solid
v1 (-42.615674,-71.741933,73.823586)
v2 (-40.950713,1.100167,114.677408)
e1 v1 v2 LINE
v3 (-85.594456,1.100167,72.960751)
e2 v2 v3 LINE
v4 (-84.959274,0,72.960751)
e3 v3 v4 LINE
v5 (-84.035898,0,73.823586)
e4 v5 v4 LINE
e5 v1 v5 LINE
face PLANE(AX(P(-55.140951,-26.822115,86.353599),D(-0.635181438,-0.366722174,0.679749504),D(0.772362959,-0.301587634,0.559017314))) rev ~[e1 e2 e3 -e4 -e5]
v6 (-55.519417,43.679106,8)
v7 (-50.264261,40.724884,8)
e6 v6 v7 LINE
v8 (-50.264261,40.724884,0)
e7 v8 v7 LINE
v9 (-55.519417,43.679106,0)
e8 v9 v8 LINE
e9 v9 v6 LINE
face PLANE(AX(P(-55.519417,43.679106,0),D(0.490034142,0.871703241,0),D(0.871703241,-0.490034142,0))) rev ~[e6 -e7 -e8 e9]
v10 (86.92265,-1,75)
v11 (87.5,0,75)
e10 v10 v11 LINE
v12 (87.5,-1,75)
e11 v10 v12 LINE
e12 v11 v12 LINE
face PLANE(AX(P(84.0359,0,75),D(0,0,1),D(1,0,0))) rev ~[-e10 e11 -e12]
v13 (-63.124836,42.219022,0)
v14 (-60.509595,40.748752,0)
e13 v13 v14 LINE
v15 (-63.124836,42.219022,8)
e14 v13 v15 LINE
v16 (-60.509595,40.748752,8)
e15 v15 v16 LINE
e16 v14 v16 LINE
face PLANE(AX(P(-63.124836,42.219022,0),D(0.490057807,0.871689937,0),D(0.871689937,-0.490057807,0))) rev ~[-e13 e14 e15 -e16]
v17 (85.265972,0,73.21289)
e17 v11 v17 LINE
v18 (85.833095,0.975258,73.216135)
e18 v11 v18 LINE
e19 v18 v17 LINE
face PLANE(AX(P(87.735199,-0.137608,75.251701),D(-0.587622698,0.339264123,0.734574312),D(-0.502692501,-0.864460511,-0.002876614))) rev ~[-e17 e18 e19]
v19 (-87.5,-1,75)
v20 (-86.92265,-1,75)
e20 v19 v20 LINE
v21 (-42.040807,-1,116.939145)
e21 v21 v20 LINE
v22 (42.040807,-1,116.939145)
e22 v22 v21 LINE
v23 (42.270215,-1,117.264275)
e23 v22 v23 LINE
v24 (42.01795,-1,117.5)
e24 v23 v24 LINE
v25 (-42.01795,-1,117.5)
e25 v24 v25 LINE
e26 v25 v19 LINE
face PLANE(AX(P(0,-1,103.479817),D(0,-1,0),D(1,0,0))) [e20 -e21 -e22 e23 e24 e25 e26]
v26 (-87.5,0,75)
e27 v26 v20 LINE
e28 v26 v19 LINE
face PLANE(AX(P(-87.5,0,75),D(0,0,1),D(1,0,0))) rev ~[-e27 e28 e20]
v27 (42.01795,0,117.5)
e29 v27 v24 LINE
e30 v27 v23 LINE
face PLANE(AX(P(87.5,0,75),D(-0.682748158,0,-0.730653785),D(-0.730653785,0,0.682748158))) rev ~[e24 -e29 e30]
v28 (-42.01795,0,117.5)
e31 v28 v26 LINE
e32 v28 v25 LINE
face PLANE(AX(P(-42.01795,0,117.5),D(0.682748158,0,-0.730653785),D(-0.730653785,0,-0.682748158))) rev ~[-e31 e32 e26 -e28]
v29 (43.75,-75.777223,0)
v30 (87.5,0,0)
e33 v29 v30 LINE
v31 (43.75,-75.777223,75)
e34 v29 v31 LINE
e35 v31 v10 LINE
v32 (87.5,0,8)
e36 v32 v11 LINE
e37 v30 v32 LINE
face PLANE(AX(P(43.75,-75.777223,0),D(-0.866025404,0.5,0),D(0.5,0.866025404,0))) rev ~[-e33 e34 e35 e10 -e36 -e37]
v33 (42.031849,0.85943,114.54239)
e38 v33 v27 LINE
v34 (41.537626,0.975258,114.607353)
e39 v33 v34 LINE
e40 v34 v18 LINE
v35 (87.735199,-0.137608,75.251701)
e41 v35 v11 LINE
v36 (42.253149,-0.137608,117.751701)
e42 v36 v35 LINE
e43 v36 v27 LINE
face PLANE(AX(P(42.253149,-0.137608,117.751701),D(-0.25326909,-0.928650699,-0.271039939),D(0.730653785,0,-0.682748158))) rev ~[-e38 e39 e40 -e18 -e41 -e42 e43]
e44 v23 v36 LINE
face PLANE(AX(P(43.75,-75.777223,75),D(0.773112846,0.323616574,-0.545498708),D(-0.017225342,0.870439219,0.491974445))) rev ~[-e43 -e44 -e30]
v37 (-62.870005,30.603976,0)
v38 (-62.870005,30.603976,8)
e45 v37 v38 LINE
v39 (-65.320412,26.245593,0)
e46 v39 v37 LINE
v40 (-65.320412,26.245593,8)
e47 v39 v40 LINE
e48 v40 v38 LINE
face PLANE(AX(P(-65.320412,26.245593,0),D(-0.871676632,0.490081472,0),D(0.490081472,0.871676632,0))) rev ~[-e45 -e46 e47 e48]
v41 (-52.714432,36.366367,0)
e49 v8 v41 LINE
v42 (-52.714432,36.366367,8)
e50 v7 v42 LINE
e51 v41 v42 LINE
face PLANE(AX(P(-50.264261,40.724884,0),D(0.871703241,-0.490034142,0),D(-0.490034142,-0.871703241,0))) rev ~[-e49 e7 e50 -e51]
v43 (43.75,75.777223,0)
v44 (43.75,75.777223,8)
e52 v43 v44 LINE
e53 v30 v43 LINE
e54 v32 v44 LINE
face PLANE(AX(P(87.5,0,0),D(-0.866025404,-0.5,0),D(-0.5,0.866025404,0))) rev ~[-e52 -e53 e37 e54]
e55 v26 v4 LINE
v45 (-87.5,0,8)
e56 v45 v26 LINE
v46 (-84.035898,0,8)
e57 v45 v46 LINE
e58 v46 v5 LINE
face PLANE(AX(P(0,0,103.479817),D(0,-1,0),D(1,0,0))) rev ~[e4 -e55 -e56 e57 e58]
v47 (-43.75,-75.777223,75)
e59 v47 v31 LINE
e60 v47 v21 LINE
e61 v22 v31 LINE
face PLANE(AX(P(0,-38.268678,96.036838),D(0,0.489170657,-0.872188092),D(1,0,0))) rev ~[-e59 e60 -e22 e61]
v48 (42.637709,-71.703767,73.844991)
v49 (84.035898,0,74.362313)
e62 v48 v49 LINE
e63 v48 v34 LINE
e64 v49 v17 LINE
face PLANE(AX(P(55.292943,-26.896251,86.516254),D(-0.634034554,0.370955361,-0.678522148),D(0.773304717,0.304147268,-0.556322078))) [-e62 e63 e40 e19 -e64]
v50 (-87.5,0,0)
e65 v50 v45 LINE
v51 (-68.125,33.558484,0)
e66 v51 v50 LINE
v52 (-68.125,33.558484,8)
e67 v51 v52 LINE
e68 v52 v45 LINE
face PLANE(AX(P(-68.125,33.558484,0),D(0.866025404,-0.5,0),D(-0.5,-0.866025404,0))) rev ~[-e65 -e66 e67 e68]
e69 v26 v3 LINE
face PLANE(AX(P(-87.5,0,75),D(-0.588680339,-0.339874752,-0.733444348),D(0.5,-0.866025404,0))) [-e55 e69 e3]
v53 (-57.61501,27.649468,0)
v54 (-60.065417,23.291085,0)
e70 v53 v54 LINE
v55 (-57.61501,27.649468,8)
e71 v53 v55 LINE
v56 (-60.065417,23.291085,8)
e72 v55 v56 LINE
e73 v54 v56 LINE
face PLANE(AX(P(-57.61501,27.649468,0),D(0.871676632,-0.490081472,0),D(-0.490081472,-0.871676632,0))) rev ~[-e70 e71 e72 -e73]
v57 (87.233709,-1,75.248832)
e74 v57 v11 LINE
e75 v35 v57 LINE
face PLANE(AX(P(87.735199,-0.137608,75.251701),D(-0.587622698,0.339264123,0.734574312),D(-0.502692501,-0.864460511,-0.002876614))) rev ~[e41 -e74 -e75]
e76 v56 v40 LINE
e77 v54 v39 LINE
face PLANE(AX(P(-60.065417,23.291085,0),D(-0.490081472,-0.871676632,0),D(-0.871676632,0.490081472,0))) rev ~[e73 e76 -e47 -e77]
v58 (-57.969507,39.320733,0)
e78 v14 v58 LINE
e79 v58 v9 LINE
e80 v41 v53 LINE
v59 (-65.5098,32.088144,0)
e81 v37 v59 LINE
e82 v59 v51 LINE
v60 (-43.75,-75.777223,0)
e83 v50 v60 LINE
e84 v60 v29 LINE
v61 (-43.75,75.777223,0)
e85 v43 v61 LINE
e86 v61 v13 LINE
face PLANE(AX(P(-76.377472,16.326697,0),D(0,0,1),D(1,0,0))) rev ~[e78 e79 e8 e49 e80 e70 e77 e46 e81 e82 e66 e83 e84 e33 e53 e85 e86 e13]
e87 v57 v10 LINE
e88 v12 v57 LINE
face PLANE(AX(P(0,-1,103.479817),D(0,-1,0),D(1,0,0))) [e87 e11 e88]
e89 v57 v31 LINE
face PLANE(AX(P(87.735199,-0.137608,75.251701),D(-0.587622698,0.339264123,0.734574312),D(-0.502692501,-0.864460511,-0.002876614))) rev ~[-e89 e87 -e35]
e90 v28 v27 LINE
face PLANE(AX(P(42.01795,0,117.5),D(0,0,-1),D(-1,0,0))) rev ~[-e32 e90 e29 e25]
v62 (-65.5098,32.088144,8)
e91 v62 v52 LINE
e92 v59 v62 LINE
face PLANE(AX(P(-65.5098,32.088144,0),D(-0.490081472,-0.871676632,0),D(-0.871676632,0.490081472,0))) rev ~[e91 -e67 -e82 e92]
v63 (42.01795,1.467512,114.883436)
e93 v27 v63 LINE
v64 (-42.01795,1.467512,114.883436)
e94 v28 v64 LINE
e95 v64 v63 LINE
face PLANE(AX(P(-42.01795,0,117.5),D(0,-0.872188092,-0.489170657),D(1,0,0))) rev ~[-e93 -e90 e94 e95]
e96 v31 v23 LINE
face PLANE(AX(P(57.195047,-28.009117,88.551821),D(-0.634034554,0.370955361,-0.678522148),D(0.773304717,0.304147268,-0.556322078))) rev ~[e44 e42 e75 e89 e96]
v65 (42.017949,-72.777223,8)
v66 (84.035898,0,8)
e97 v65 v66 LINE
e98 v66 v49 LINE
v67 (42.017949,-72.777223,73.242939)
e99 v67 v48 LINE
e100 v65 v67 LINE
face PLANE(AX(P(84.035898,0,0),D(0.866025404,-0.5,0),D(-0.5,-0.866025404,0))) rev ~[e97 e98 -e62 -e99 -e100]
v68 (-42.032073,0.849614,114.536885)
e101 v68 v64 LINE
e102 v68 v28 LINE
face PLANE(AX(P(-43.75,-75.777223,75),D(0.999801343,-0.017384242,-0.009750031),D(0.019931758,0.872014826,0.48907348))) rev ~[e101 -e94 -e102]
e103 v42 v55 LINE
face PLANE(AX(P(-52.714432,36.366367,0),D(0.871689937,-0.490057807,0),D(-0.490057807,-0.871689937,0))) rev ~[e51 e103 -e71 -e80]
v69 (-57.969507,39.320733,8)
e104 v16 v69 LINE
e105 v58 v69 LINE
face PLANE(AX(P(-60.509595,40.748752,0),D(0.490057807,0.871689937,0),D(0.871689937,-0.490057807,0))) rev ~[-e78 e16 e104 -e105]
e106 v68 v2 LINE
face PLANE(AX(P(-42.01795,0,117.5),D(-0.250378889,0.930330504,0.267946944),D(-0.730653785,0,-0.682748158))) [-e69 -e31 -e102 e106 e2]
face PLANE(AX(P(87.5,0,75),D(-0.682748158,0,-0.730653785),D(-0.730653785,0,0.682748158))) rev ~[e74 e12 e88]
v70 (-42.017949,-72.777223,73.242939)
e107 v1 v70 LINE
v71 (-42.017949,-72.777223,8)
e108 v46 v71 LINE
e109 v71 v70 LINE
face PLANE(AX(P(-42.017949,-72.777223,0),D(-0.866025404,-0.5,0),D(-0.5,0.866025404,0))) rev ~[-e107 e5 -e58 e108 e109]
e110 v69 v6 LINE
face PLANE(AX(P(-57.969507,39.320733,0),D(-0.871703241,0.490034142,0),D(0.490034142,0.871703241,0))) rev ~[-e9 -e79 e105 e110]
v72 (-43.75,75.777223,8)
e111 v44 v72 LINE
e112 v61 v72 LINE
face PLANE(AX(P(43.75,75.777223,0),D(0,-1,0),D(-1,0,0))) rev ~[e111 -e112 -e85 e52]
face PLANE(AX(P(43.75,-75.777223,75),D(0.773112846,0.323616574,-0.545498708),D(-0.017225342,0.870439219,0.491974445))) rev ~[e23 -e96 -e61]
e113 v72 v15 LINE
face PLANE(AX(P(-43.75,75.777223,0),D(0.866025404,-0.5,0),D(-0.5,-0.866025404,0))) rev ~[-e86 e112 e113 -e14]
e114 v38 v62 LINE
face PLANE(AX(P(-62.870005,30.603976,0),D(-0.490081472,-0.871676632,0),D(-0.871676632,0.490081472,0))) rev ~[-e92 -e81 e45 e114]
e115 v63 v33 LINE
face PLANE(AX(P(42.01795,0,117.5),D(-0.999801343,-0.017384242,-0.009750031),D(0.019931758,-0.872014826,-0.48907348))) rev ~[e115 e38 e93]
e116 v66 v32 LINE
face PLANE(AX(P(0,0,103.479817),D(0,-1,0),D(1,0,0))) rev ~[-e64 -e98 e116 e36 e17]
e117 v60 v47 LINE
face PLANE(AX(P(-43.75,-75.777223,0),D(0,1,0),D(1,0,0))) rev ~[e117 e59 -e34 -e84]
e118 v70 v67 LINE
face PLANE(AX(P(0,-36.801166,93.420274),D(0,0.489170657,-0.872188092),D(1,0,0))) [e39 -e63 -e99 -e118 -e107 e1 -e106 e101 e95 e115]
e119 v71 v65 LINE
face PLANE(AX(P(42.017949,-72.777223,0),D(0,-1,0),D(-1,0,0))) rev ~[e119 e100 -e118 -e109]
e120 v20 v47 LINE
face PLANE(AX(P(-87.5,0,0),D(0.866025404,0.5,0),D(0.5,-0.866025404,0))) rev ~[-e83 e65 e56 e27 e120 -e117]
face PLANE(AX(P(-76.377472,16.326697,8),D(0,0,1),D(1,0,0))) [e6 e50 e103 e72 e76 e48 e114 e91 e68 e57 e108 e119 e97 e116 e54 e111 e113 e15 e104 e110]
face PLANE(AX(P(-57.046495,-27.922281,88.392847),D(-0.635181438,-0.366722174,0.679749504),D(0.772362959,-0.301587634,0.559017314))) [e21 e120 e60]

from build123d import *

# Parameters (mm, degrees)
F0_W      = 50
F0_H      = 12.5
F1_DEPTH  = 8
F2_DEPTH  = 75
F4_DEPTH  = 8
F7_DEPTH  = 3
F8_DEPTH  = 1
F11_DEPTH = 3
F14_DEPTH = 3
F15_DEPTH = 8
F16_DEPTH = 25
F17_DEPTH = 8


# Not quite as in the source:
# - a feature names something its author has since deleted; it is built from what else it names


with BuildPart() as f1:
    # F0 (on Top) → F1 (new body)
    with BuildSketch(Plane.XY):
        Polygon((-42.0179491924, 72.7772228311), (-60.5095952989, 40.7487522591), (-57.9695070384, 39.3207329262), (-55.5194165334, 43.6791064608), (-50.2642610162, 40.7248836223), (-52.7144317239, 36.366367418), (-57.615009792, 27.6494680496), (-60.0654171506, 23.2910848888), (-65.3204122546, 26.2455930623), (-62.870004896, 30.6039762231), (-65.5097997054, 32.0881441788), (-84.0358983849, 0), (-42.0179491924, -72.7772228311), (42.0179491924, -72.7772228311), (84.0358983849, 0), (42.0179491924, 72.7772228311), align=None)
        with Locations((0, 54.5829171234)):
            Rectangle(F0_W, F0_H, mode=Mode.SUBTRACT)
    extrude(amount=F1_DEPTH)

    # F0 (on Top) → F2 (join)
    with BuildSketch(Plane.XY):
        Polygon((43.75, -75.7772228311), (87.5, 0), (84.0358983849, 0), (42.0179491924, -72.7772228311), (-42.0179491924, -72.7772228311), (-84.0358983849, 0), (-87.5, 0), (-43.75, -75.7772228311), align=None)
    extrude(amount=F2_DEPTH)

    # F0 (on Top) → F4 (join)
    with BuildSketch(Plane.XY):
        Polygon((43.75, 75.7772228311), (-43.75, 75.7772228311), (-63.1248363216, 42.2190219338), (-60.5095952989, 40.7487522591), (-42.0179491924, 72.7772228311), (42.0179491924, 72.7772228311), (84.0358983849, 0), (87.5, 0), align=None)
    extrude(amount=F4_DEPTH)

    # F6 (on face) → F7 (join)
    with BuildSketch(Plane(origin=(0, -50.1312366318, 89.3836679776), x_dir=(1, 0, 0), z_dir=(0, 0.4891706574, -0.872188092))):
        Polygon((43.75, 29.4041920927), (0, 29.4041920927), (-43.75, 29.4041920927), (-42.01795, -57.4775522498), (42.01795, -57.4775522498), align=None)
    extrude(amount=F7_DEPTH)

    # F3 (on Front) → F8 (join)
    with BuildSketch(Plane.XZ):
        Polygon((-42.01795, 114.5), (0, 114.5), (42.01795, 114.5), (84.0359, 75), (87.5, 75), (42.01795, 117.5), (0, 117.5), (-42.01795, 117.5), (-87.5, 75), (-84.0359, 75), align=None)
    extrude(amount=F8_DEPTH)

    # F10 (on face) → F11 (join)
    with BuildSketch(Plane(origin=(-67.6846727043, -39.0777640058, 72.4338274863), x_dir=(0.7723629594, -0.3015876344, 0.5590173143), z_dir=(-0.6351814378, -0.3667221741, 0.6797495039))):
        Polygon((33.2314262259, 55.789645187), (-25.6554603702, 35.6104118215), (30.9888924807, -31.0804218073), align=None)
    extrude(amount=-F11_DEPTH)

    # F13 (on face) → F14 (join)
    with BuildSketch(Plane(origin=(67.6756688636, -39.5950852503, 72.4241918832), x_dir=(0.7733047167, 0.3041472681, -0.556322078), z_dir=(-0.6340345536, 0.3709553614, -0.6785221475))):
        Polygon((-30.939509805, 30.5117392321), (-32.8751652468, -56.3649154418), (25.9400068576, -35.9776056011), align=None)
    extrude(amount=F14_DEPTH)

    # F0 (on Top) → F15 (join)
    with BuildSketch(Plane.XY):
        with Locations((0, 54.5829171234)):
            Rectangle(F0_W, F0_H)
    extrude(amount=F15_DEPTH)

    # F0 (on Top) → F16 (cut)
    with BuildSketch(Plane.XY):
        Polygon((-57.9695070384, 39.3207329262), (-60.5095952989, 40.7487522591), (-65.5097997054, 32.0881441788), (-62.870004896, 30.6039762231), (-57.615009792, 27.6494680496), (-52.7144317239, 36.366367418), align=None)
    extrude(amount=-F16_DEPTH, mode=Mode.SUBTRACT)

    # F0 (on Top) → F17 (join)
    with BuildSketch(Plane.XY):
        Polygon((-65.5097997054, 32.0881441788), (-68.125, 33.5584843966), (-87.5, 0), (-84.0358983849, 0), align=None)
    extrude(amount=F17_DEPTH)


solid = f1.part
